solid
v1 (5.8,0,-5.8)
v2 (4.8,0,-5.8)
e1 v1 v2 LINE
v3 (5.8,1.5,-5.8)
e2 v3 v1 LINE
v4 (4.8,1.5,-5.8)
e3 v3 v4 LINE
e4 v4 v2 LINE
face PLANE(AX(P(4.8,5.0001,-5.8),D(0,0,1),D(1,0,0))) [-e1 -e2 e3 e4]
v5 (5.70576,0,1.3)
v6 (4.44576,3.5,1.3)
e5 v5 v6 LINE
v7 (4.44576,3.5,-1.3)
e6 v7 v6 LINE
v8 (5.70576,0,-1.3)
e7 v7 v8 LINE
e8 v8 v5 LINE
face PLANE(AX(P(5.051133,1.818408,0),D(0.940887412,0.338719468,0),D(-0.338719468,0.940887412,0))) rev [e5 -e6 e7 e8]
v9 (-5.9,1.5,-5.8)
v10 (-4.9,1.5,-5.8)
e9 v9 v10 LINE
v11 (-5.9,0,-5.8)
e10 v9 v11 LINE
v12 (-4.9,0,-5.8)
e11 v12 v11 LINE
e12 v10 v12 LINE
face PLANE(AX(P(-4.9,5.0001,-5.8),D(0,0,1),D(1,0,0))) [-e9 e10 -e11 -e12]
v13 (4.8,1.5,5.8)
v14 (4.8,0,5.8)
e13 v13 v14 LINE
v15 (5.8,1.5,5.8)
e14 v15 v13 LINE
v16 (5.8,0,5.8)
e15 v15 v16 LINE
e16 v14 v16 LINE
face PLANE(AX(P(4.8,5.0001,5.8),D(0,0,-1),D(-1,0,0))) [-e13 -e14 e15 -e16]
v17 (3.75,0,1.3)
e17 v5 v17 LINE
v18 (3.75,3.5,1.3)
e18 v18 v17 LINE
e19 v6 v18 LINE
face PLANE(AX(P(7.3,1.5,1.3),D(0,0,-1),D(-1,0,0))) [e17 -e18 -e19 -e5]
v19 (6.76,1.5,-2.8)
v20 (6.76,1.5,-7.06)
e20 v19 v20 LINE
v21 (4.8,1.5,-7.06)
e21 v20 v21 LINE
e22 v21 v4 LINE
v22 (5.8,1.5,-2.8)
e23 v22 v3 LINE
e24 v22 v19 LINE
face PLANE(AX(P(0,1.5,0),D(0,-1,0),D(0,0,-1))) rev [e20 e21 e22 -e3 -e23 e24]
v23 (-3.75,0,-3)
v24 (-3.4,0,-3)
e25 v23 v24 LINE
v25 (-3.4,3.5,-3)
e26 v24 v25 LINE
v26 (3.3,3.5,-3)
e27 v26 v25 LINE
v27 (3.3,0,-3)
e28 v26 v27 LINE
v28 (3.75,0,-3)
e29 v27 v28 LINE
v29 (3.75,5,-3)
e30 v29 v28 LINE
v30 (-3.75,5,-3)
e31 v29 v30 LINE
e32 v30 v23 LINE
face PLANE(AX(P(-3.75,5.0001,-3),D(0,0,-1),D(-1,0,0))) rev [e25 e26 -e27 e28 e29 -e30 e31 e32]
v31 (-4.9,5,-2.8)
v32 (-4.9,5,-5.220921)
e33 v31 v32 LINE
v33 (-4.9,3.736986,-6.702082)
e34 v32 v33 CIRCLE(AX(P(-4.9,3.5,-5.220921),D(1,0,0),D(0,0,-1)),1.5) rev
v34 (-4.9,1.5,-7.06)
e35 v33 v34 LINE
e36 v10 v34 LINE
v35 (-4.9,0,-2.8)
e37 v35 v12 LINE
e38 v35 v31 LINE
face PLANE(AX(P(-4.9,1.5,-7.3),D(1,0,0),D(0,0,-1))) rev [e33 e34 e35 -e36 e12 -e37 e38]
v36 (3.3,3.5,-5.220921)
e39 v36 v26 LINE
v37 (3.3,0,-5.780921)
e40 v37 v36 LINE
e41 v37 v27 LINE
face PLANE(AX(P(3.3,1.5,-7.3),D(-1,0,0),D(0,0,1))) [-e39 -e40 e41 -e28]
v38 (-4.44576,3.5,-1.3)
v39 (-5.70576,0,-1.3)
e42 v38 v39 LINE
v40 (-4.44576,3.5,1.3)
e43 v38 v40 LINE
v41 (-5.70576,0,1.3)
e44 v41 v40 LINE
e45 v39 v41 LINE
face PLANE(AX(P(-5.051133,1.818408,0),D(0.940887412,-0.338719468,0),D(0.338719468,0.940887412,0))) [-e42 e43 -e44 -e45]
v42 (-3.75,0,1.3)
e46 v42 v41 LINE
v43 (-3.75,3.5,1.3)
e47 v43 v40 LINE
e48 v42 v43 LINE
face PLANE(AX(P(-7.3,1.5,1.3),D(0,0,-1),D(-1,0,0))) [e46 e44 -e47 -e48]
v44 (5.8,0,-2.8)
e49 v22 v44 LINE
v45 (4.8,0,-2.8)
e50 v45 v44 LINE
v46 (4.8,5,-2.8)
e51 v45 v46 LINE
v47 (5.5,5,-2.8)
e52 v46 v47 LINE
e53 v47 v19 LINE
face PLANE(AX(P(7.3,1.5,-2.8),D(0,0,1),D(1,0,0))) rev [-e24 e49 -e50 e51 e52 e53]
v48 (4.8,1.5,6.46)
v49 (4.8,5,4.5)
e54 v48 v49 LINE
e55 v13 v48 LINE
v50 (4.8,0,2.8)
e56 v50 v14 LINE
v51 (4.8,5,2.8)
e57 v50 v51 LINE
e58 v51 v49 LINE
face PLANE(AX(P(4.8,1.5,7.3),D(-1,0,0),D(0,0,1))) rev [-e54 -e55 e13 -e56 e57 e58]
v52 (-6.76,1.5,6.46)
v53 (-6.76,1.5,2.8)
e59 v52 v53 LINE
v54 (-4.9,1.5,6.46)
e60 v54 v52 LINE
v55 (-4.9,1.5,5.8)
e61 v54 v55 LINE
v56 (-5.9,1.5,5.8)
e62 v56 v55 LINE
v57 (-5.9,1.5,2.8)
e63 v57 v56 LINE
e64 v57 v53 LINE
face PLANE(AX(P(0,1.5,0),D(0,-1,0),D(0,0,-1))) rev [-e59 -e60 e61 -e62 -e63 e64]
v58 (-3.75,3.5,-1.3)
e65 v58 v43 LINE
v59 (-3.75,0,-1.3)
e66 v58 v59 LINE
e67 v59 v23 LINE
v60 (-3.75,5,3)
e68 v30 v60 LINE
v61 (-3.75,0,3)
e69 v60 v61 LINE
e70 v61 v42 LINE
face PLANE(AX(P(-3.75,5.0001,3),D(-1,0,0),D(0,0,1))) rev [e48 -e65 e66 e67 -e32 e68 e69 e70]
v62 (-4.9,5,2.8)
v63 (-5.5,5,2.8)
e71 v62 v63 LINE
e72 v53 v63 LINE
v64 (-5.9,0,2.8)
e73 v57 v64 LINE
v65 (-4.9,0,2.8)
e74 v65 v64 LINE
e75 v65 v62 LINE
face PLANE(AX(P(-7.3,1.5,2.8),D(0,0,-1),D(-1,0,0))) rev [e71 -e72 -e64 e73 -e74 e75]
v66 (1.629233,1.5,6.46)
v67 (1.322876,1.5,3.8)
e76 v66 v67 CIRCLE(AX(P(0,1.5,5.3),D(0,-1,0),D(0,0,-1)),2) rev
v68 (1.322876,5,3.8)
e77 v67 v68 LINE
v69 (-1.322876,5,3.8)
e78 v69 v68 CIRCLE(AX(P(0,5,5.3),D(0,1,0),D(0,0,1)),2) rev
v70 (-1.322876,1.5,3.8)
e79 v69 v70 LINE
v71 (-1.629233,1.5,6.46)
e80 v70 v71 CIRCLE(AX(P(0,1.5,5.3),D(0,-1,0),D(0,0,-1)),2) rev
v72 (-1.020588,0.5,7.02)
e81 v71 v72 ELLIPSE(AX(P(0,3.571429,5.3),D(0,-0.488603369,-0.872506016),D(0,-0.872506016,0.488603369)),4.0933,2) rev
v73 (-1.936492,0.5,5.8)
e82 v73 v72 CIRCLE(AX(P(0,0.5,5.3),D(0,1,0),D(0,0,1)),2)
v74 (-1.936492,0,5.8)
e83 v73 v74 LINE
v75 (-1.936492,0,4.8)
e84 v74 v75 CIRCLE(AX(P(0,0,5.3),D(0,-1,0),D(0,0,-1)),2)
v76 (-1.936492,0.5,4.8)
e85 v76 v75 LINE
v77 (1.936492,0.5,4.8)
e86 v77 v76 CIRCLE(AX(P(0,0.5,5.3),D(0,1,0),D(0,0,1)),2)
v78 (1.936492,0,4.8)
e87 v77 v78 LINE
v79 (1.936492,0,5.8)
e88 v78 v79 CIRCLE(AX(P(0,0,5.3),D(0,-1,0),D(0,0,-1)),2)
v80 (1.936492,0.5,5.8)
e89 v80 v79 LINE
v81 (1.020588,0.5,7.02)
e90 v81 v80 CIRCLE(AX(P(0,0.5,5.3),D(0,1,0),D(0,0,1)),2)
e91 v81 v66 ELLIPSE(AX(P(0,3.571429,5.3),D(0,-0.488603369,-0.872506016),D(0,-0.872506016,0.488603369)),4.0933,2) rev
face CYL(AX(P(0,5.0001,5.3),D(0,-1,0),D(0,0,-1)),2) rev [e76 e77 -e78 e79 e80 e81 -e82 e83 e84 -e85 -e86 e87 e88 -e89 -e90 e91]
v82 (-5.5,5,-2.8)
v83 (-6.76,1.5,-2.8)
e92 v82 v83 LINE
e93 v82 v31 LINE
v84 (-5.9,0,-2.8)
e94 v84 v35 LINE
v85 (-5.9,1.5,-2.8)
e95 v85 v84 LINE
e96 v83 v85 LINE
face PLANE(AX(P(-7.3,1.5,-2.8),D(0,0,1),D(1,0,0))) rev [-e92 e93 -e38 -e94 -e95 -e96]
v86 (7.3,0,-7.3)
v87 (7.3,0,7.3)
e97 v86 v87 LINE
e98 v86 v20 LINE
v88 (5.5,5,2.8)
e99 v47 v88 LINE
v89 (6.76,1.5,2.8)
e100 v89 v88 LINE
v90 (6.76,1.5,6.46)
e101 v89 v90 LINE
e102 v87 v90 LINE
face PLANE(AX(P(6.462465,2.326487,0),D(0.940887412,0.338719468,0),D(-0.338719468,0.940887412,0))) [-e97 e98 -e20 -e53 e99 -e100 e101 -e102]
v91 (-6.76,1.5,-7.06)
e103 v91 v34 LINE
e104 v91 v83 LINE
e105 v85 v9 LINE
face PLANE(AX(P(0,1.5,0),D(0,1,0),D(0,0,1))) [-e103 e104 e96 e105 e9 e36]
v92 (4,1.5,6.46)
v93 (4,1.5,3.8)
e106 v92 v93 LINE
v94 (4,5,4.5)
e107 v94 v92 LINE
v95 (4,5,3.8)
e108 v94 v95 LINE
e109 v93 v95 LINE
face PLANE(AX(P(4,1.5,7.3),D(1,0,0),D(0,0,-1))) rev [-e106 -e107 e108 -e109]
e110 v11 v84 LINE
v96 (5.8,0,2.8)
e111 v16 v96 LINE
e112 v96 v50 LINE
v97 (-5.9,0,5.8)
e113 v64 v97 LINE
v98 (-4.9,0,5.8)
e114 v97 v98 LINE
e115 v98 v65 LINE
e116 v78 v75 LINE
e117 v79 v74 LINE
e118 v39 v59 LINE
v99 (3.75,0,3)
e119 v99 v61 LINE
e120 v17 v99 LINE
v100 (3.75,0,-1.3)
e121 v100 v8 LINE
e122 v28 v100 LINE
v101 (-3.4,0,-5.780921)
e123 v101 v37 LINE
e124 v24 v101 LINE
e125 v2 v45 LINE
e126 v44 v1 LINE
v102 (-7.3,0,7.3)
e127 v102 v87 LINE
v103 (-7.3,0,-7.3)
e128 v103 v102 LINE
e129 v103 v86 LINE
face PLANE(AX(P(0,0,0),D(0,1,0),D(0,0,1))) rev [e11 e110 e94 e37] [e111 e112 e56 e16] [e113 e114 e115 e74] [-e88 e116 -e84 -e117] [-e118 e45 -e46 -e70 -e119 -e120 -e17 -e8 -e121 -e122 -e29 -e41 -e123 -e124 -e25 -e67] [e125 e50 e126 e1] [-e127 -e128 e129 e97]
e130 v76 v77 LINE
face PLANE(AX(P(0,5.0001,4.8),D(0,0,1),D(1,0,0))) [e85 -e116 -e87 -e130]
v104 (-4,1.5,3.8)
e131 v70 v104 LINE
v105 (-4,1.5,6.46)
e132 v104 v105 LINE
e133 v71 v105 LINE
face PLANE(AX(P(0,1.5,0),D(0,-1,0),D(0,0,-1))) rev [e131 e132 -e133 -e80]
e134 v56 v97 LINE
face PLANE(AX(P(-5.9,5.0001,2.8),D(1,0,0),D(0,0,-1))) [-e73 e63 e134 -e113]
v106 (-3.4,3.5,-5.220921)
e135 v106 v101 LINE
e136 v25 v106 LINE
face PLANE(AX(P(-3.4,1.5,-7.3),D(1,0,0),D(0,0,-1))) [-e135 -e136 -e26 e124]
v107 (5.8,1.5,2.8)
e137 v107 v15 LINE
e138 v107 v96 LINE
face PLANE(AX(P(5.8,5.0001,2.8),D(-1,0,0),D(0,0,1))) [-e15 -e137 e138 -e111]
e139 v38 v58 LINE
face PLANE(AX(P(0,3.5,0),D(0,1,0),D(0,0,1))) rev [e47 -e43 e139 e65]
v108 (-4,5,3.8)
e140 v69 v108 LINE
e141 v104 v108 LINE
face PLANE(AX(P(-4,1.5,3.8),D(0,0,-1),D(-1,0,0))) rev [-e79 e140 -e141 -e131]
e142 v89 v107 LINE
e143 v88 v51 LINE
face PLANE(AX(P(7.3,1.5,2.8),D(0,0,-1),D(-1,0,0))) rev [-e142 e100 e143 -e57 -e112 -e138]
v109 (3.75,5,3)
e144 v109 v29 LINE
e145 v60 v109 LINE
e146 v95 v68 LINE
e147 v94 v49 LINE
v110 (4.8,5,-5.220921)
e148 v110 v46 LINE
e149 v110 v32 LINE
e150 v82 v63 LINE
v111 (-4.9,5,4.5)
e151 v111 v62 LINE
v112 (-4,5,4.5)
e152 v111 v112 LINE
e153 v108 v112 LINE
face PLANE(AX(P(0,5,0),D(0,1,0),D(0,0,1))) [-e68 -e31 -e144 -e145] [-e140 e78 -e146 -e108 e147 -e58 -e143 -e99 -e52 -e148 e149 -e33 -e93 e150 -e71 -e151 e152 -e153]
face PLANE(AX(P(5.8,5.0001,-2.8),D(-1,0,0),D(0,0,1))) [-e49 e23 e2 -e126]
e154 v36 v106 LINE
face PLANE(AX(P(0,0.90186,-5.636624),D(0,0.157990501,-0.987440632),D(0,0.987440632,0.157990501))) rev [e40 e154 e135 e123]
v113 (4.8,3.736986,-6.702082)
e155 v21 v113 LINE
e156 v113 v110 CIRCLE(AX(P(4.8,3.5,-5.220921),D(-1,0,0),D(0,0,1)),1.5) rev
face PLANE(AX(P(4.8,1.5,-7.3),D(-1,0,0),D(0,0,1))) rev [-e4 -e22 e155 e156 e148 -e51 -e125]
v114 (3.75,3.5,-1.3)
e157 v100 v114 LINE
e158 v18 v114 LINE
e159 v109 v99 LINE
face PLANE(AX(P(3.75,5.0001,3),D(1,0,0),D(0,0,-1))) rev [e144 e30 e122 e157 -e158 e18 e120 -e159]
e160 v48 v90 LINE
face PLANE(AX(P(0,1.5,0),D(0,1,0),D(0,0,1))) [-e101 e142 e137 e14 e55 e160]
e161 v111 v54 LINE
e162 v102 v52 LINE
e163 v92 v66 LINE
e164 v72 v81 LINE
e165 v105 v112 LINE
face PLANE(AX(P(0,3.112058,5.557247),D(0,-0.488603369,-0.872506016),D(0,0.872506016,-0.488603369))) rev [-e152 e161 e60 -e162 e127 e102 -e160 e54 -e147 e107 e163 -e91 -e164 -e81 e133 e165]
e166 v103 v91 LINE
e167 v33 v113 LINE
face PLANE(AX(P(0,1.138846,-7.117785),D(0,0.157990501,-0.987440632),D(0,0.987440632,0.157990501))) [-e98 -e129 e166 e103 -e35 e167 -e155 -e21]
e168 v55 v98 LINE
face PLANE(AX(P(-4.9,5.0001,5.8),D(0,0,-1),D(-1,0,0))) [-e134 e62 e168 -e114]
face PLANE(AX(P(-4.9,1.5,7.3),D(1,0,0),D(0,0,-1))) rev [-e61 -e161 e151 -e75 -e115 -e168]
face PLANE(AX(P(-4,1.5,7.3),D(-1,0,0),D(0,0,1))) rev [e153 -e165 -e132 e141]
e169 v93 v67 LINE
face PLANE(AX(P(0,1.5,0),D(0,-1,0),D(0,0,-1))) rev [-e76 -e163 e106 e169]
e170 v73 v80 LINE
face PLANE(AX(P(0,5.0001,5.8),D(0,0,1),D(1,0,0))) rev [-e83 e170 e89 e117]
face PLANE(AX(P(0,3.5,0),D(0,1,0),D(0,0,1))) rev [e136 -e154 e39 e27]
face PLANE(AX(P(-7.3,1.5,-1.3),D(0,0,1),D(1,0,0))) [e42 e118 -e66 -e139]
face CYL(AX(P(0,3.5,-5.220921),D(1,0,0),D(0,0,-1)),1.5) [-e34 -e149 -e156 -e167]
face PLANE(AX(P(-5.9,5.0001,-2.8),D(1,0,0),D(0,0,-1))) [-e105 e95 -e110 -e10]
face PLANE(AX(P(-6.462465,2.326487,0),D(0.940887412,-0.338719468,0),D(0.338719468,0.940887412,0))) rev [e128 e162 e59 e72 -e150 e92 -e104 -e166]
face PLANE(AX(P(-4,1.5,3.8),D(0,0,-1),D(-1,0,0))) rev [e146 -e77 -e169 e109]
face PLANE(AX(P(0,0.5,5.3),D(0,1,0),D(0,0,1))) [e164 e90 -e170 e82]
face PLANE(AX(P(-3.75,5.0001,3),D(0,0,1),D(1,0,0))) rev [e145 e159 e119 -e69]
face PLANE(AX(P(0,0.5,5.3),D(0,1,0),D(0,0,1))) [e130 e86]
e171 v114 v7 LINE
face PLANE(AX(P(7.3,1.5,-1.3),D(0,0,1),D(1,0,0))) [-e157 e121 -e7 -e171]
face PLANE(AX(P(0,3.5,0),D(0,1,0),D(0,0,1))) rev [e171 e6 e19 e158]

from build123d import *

# Parameters (mm, degrees)
FILLET1_R               = 1.5
SKETCH4_W               = 2.4
SKETCH4_H               = 4.5
SKETCH4_W_2             = 2.5
SKETCH4_W_3             = 8
SKETCH4_H_2             = 3.5
CUT_EXTRUDE1_DEPTH      = 3.5
SKETCH3_W               = 7.5
SKETCH3_H               = 6
CUT_EXTRUDE2_DEPTH      = 12.470832747
CUT_EXTRUDE5_DEPTH      = 11.900917559
CUT_EXTRUDE5_DEPTH_BACK = 1
SKETCH5_R               = 2
CUT_EXTRUDE6_START      = -0.5
CUT_EXTRUDE6_DEPTH      = 1.5
SKETCH9_W               = 1
SKETCH9_H               = 3
CUT_EXTRUDE9_DEPTH      = 12.470832747


with BuildPart() as part:
    # Sketch1 → Loft1 section 0
    with BuildSketch(Plane(origin=(0, 0, 0), x_dir=(1, 0, 0), z_dir=(0, 1, 0))):
        with BuildLine():
            Line((-7.3, 7.3), (7.3, 7.3))
            Line((7.3, 7.3), (7.3, -7.3))
            Line((7.3, -7.3), (-7.3, -7.3))
            Line((-7.3, -7.3), (-7.3, 7.3))
        make_face()
    # Sketch2 → Loft1 section 1
    with BuildSketch(Plane(origin=(0, 5, 0), x_dir=(1, 0, 0), z_dir=(0, 1, 0))):
        with BuildLine():
            Line((-5.5, 6.5), (5.5, 6.5))
            Line((5.5, 6.5), (5.5, -4.5))
            Line((5.5, -4.5), (-5.5, -4.5))
            Line((-5.5, -4.5), (-5.5, 6.5))
        make_face()
    loft()

    # Fillet1
    fillet1_edges = [part.edges().sort_by_distance(p)[0] for p in [
        (0, 5, -6.5),
    ]]
    fillet(fillet1_edges, radius=FILLET1_R)

    # Sketch4 → Cut-Extrude1 (cut)
    with BuildSketch(Plane(origin=(0, 5, 0), x_dir=(1, 0, 0), z_dir=(0, 1, 0))):
        with Locations((-6.1, -5.05)):
            Rectangle(SKETCH4_W, SKETCH4_H)
        with Locations((6.05, 5.05)):
            Rectangle(SKETCH4_W_2, SKETCH4_H)
        with Locations((-6.1, 5.05)):
            Rectangle(SKETCH4_W, SKETCH4_H)
        with Locations((6.05, -5.05)):
            Rectangle(SKETCH4_W_2, SKETCH4_H)
        with Locations((0, -5.55)):
            Rectangle(SKETCH4_W_3, SKETCH4_H_2)
    extrude(amount=-CUT_EXTRUDE1_DEPTH, mode=Mode.SUBTRACT)

    # Shell2: read off the stored shape, not the designer's step
    # Shell2: loft between two sections, ruled curve by curve
    shell2_from = [
        Edge.make_line((5.705760369, 0, 1.3), (5.705760369, 0, -1.3)),
        Edge.make_line((-3.4, 0, -5.780921332), (3.3, 0, -5.780921332)),
        Edge.make_line((-5.705760369, 0, 1.3), (-5.705760369, 0, -1.3)),
        Edge.make_line((5.705760369, 0, -1.3), (3.3, 0, -1.3)),
        Edge.make_line((-5.705760369, 0, -1.3), (-3.4, 0, -1.3)),
        Edge.make_line((3.3, 0, -5.780921332), (3.3, 0, -1.3)),
        Edge.make_line((3.3, 0, 1.3), (3.3, 0, 2.3)),
        Edge.make_line((-3.4, 0, -5.780921332), (-3.4, 0, -1.3)),
        Edge.make_line((-3.4, 0, 2.3), (-3.4, 0, 1.3)),
        Edge.make_line((-3.4, 0, 1.3), (-5.705760369, 0, 1.3)),
        Edge.make_line((5.705760369, 0, 1.3), (3.3, 0, 1.3)),
        Edge.make_line((3.3, 0, 2.3), (-3.4, 0, 2.3)),
    ]
    shell2_to = [
        Edge.make_line((4.445760369, 3.5, 1.3), (4.445760369, 3.5, -1.3)),
        Edge.make_line((-3.4, 3.5, -5.220921332), (3.3, 3.5, -5.220921332)),
        Edge.make_line((-4.445760369, 3.5, 1.3), (-4.445760369, 3.5, -1.3)),
        Edge.make_line((4.445760369, 3.5, -1.3), (3.3, 3.5, -1.3)),
        Edge.make_line((-4.445760369, 3.5, -1.3), (-3.4, 3.5, -1.3)),
        Edge.make_line((3.3, 3.5, -5.220921332), (3.3, 3.5, -1.3)),
        Edge.make_line((3.3, 3.5, 1.3), (3.3, 3.5, 2.3)),
        Edge.make_line((-3.4, 3.5, -5.220921332), (-3.4, 3.5, -1.3)),
        Edge.make_line((-3.4, 3.5, 2.3), (-3.4, 3.5, 1.3)),
        Edge.make_line((-3.4, 3.5, 1.3), (-4.445760369, 3.5, 1.3)),
        Edge.make_line((4.445760369, 3.5, 1.3), (3.3, 3.5, 1.3)),
        Edge.make_line((3.3, 3.5, 2.3), (-3.4, 3.5, 2.3)),
    ]
    shell2 = Solid(Shell([*[Face.make_surface_from_curves(shell2_from[k], shell2_to[k]) for k in range(12)], Face(Wire(shell2_from)), Face(Wire(shell2_to))]))
    add(shell2, mode=Mode.SUBTRACT)

    # Sketch3 → Cut-Extrude2 (cut, through all)
    with BuildSketch(Plane.XZ):
        Rectangle(SKETCH3_W, SKETCH3_H)
    extrude(amount=-CUT_EXTRUDE2_DEPTH, mode=Mode.SUBTRACT)

    # Sketch5 → Cut-Extrude5 (cut, two sides: drawn at the far end of the back side and taken through both)
    with BuildSketch(Plane(origin=(0, 1.5, 0), x_dir=(1, 0, 0), z_dir=(0, 1, 0)).offset(-CUT_EXTRUDE5_DEPTH_BACK)):
        with Locations((0, -5.3)):
            Circle(SKETCH5_R)
    extrude(amount=CUT_EXTRUDE5_DEPTH + CUT_EXTRUDE5_DEPTH_BACK, mode=Mode.SUBTRACT)

    # Cut-Extrude6: read off the stored shape, not the designer's step
    # Cut-Extrude6 outline → Cut-Extrude6 (cut)
    with BuildSketch(Plane.XZ.offset(CUT_EXTRUDE6_START)):
        with BuildLine():
            Line((1.936491673, 5.8), (-1.936491673, 5.8))
            ThreePointArc((-1.936491673, 5.8), (-2, 5.3), (-1.936491673, 4.8))
            Line((-1.936491673, 4.8), (1.936491673, 4.8))
            ThreePointArc((1.936491673, 4.8), (2, 5.3), (1.936491673, 5.8))
        make_face()
    extrude(amount=CUT_EXTRUDE6_DEPTH, mode=Mode.SUBTRACT)

    # Sketch9 → Cut-Extrude9 (cut, through all)
    with BuildSketch(Plane(origin=(0, 0, 0), x_dir=(1, 0, 0), z_dir=(0, 1, 0))):
        with Locations((-5.4, 4.3)):
            Rectangle(SKETCH9_W, SKETCH9_H)
        with Locations((5.3, 4.3)):
            Rectangle(SKETCH9_W, SKETCH9_H)
        with Locations((-5.4, -4.3)):
            Rectangle(SKETCH9_W, SKETCH9_H)
        with Locations((5.3, -4.3)):
            Rectangle(SKETCH9_W, SKETCH9_H)
    extrude(amount=CUT_EXTRUDE9_DEPTH, mode=Mode.SUBTRACT)


solid = part.part
